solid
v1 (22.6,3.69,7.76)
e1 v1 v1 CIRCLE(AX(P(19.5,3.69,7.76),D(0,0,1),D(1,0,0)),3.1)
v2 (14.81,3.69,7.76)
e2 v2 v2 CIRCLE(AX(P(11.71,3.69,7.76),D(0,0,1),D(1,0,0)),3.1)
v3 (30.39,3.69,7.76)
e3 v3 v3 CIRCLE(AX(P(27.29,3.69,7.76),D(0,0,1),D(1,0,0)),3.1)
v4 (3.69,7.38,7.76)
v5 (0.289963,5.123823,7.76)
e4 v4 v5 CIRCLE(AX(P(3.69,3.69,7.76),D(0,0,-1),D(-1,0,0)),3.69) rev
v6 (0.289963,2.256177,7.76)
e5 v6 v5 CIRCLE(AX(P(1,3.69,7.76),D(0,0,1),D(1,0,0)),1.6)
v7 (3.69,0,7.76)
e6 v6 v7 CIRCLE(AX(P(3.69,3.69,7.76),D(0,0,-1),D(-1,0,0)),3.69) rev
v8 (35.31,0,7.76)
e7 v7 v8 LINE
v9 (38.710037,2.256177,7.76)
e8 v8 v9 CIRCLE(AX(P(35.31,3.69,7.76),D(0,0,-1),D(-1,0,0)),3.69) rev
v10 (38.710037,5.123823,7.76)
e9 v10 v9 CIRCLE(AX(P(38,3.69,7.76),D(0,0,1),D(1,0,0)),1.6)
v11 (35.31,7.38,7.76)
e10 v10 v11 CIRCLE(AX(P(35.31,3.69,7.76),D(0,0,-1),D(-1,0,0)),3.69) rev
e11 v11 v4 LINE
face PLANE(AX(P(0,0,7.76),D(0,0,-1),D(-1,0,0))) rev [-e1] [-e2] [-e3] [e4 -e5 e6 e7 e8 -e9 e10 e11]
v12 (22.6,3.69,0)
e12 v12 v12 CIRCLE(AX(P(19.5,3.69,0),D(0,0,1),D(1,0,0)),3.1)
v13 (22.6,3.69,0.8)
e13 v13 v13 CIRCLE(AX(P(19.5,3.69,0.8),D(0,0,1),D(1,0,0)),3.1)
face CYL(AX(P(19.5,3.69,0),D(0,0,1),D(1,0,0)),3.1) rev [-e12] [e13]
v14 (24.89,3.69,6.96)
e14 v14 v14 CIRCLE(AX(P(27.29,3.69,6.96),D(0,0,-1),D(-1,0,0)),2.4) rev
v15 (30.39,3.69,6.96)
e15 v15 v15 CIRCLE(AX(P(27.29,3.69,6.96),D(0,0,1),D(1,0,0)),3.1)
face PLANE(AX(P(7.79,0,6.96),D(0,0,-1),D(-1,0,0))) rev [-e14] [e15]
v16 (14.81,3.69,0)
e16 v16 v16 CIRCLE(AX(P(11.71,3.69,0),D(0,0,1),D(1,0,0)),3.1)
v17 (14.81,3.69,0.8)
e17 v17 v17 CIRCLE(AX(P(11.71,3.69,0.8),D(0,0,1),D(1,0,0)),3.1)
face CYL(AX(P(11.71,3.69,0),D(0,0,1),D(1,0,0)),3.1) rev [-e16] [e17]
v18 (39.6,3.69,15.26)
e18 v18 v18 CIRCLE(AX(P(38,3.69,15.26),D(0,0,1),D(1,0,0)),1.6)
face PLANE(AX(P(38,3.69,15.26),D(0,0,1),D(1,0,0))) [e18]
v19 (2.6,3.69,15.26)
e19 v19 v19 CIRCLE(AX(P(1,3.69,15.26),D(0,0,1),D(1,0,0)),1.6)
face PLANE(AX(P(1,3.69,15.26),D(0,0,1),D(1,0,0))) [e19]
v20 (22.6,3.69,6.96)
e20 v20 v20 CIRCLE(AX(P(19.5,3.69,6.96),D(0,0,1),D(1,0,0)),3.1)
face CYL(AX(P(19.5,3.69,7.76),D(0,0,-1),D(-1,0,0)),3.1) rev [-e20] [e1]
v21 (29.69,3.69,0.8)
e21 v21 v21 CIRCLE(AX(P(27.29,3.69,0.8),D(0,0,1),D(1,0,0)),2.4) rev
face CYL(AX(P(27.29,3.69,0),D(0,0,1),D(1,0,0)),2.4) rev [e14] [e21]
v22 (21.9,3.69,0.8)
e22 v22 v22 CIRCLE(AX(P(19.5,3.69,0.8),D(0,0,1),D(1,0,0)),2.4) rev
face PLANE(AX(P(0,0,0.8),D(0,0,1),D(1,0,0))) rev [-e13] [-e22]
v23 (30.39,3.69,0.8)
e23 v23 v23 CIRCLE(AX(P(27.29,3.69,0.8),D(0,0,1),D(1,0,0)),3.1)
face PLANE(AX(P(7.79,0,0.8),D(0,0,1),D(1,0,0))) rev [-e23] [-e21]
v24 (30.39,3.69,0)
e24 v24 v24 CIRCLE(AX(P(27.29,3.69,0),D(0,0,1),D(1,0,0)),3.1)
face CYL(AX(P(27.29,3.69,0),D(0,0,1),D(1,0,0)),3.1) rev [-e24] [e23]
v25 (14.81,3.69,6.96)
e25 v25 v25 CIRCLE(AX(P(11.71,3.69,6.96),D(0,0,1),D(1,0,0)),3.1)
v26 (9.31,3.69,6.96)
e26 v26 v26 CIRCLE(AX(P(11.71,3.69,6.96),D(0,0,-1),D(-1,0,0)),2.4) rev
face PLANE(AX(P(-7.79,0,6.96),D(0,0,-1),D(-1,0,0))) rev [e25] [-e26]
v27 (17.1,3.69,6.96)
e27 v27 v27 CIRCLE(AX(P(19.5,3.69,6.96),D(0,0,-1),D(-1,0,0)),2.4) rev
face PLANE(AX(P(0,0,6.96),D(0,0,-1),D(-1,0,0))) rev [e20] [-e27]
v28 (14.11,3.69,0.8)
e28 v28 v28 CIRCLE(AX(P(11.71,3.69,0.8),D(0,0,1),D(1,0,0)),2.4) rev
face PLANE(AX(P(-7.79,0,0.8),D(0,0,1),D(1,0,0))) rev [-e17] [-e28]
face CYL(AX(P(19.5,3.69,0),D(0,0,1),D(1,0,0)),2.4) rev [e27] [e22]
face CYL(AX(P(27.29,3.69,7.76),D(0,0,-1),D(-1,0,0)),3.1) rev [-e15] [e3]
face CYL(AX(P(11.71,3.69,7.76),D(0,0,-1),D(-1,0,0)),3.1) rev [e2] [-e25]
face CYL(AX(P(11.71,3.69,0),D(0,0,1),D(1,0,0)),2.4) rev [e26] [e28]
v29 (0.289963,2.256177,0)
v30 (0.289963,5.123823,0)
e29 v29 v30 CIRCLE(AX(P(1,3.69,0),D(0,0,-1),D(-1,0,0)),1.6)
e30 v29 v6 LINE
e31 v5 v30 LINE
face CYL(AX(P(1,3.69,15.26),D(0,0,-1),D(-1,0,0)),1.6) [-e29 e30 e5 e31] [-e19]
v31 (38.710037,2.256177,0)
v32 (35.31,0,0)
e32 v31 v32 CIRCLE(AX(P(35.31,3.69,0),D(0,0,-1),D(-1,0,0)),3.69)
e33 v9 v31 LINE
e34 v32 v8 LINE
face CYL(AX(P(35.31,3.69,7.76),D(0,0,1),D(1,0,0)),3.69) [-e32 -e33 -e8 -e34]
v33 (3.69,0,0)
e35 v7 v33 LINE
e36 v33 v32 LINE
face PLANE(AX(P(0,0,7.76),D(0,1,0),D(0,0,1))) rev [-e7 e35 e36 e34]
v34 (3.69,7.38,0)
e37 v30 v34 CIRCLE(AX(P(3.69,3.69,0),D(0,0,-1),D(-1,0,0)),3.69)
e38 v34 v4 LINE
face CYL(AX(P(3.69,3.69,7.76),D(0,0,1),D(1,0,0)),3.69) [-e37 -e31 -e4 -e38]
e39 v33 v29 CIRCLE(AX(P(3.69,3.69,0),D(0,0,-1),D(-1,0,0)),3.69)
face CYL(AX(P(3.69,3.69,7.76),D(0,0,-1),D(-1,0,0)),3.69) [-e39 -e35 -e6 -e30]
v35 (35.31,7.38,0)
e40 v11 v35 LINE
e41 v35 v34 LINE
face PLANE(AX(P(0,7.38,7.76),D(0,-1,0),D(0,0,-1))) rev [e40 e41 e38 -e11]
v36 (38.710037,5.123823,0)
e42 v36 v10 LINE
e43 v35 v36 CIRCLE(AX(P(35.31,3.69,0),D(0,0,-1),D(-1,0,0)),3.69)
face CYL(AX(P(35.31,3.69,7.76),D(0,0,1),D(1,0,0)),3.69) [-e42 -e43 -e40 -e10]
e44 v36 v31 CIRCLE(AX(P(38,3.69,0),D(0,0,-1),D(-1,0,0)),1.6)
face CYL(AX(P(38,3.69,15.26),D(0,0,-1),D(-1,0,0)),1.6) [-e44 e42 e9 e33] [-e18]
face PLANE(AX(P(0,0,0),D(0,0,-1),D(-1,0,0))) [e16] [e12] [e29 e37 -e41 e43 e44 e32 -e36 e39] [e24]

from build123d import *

# Parameters (mm, degrees)
SKETCH1_W                = 39
SKETCH1_H                = 7.38
BOSS_EXTRUDE1_DEPTH      = 7.76
SKETCH2_R                = 2.4
CUT_EXTRUDE1_DEPTH       = 7.76
CUT_EXTRUDE2_OUTLINE_R   = 3.1
CUT_EXTRUDE2_OUTLINE_R_2 = 2.4
CUT_EXTRUDE2_DEPTH       = 0.8
CUT_EXTRUDE3_START       = 6.96
CUT_EXTRUDE3_OUTLINE_R   = 3.1
CUT_EXTRUDE3_OUTLINE_R_2 = 2.4
CUT_EXTRUDE3_DEPTH       = 0.8
LPATTERN3_COUNT          = 3
LPATTERN3_PITCH          = 7.79
LPATTERN6_COUNT          = 3
LPATTERN6_PITCH          = 7.79
FILLET1_R                = 3.69
FILLET2_R                = 3.69
FILLET3_R                = 3.69
FILLET4_R                = 3.69
SKETCH3_R                = 3.1
BOSS_EXTRUDE2_DEPTH      = 7.76
BOSS_EXTRUDE3_START      = -7.76
SKETCH4_R                = 3.1
BOSS_EXTRUDE3_DEPTH      = 7.76
SKETCH6_R                = 1.6
BOSS_EXTRUDE4_DEPTH      = 7.5
SKETCH10_R               = 1.6
BOSS_EXTRUDE5_DEPTH      = 8


# Read off the part's stored shape, not the designer's step: Cut-Extrude2, Cut-Extrude3
with BuildPart() as part:
    # Sketch1 → Boss-Extrude1 (new body)
    with BuildSketch(Plane.XY):
        with Locations((19.5, 3.69)):
            Rectangle(SKETCH1_W, SKETCH1_H)
    extrude(amount=BOSS_EXTRUDE1_DEPTH)

    # Sketch2 → Cut-Extrude1 (cut)
    with BuildSketch(Plane.XY.offset(7.76)):
        with Locations((19.5, 3.69)):
            Circle(SKETCH2_R)
    cut_extrude1 = extrude(amount=-CUT_EXTRUDE1_DEPTH, mode=Mode.SUBTRACT)

    # Cut-Extrude2 outline → Cut-Extrude2 (cut)
    with BuildSketch(Plane.XY):
        with Locations((19.5, 3.69)):
            Circle(CUT_EXTRUDE2_OUTLINE_R)
        with Locations((19.5, 3.69)):
            Circle(CUT_EXTRUDE2_OUTLINE_R_2, mode=Mode.SUBTRACT)
    cut_extrude2 = extrude(amount=CUT_EXTRUDE2_DEPTH, mode=Mode.SUBTRACT)

    # Cut-Extrude3 outline → Cut-Extrude3 (cut)
    with BuildSketch(Plane.XY.offset(CUT_EXTRUDE3_START)):
        with Locations((19.5, 3.69)):
            Circle(CUT_EXTRUDE3_OUTLINE_R)
        with Locations((19.5, 3.69)):
            Circle(CUT_EXTRUDE3_OUTLINE_R_2, mode=Mode.SUBTRACT)
    cut_extrude3 = extrude(amount=CUT_EXTRUDE3_DEPTH, mode=Mode.SUBTRACT)

    # LPattern3: Cut-Extrude1, Cut-Extrude2, Cut-Extrude3 ×3
    with Locations(*[(-i * LPATTERN3_PITCH, 0, 0) for i in range(1, LPATTERN3_COUNT)]):
        add(cut_extrude1, mode=Mode.SUBTRACT)
        add(cut_extrude2, mode=Mode.SUBTRACT)
        add(cut_extrude3, mode=Mode.SUBTRACT)

    # LPattern6: Cut-Extrude1, Cut-Extrude2, Cut-Extrude3 ×3
    with Locations(*[(i * LPATTERN6_PITCH, 0, 0) for i in range(1, LPATTERN6_COUNT)]):
        add(cut_extrude1, mode=Mode.SUBTRACT)
        add(cut_extrude2, mode=Mode.SUBTRACT)
        add(cut_extrude3, mode=Mode.SUBTRACT)

    # Fillet1
    fillet1_edges = [part.edges().sort_by_distance(p)[0] for p in [
        (0, 7.38, 3.88),
    ]]
    fillet(fillet1_edges, radius=FILLET1_R)

    # Fillet2
    fillet2_edges = [part.edges().sort_by_distance(p)[0] for p in [
        (0, 0, 3.88),
    ]]
    fillet(fillet2_edges, radius=FILLET2_R - 0.0001)  # a hair under: the kernel refuses the full size

    # Fillet3
    fillet3_edges = [part.edges().sort_by_distance(p)[0] for p in [
        (39, 7.38, 3.88),
    ]]
    fillet(fillet3_edges, radius=FILLET3_R)

    # Fillet4
    fillet4_edges = [part.edges().sort_by_distance(p)[0] for p in [
        (39, 0, 3.88),
    ]]
    fillet(fillet4_edges, radius=FILLET4_R - 0.0001)  # a hair under: the kernel refuses the full size

    # Sketch3 → Boss-Extrude2 (add)
    with BuildSketch(Plane(origin=(0, 0, 0), x_dir=(-1, 0, 0), z_dir=(0, 0, -1))):
        with Locations((-35.08, 3.69)):
            Circle(SKETCH3_R)
    extrude(amount=-BOSS_EXTRUDE2_DEPTH)

    # Sketch4 → Boss-Extrude3 (add)
    with BuildSketch(Plane.XY.offset(7.76).offset(BOSS_EXTRUDE3_START)):
        with Locations((3.92, 3.69)):
            Circle(SKETCH4_R)
    extrude(amount=BOSS_EXTRUDE3_DEPTH)

    # Sketch6 → Boss-Extrude4 (add)
    with BuildSketch(Plane.XY.offset(7.76)):
        with Locations(Location((1, 3.69, 0), (0, 0, 243.655122674))):
            Circle(SKETCH6_R)
        with Locations(Location((38, 3.69, 0), (0, 0, 296.344877326))):
            Circle(SKETCH6_R)
    extrude(amount=BOSS_EXTRUDE4_DEPTH)

    # Sketch10 → Boss-Extrude5 (add)
    with BuildSketch(Plane(origin=(0, 0, 0), x_dir=(-1, 0, 0), z_dir=(0, 0, -1))):
        with Locations(Location((-38, 3.69, 0), (0, 0, 116.344877326))):
            Circle(SKETCH10_R)
        with Locations(Location((-1, 3.69, 0), (0, 0, 63.655122674))):
            Circle(SKETCH10_R)
    extrude(amount=-BOSS_EXTRUDE5_DEPTH)


solid = part.part
